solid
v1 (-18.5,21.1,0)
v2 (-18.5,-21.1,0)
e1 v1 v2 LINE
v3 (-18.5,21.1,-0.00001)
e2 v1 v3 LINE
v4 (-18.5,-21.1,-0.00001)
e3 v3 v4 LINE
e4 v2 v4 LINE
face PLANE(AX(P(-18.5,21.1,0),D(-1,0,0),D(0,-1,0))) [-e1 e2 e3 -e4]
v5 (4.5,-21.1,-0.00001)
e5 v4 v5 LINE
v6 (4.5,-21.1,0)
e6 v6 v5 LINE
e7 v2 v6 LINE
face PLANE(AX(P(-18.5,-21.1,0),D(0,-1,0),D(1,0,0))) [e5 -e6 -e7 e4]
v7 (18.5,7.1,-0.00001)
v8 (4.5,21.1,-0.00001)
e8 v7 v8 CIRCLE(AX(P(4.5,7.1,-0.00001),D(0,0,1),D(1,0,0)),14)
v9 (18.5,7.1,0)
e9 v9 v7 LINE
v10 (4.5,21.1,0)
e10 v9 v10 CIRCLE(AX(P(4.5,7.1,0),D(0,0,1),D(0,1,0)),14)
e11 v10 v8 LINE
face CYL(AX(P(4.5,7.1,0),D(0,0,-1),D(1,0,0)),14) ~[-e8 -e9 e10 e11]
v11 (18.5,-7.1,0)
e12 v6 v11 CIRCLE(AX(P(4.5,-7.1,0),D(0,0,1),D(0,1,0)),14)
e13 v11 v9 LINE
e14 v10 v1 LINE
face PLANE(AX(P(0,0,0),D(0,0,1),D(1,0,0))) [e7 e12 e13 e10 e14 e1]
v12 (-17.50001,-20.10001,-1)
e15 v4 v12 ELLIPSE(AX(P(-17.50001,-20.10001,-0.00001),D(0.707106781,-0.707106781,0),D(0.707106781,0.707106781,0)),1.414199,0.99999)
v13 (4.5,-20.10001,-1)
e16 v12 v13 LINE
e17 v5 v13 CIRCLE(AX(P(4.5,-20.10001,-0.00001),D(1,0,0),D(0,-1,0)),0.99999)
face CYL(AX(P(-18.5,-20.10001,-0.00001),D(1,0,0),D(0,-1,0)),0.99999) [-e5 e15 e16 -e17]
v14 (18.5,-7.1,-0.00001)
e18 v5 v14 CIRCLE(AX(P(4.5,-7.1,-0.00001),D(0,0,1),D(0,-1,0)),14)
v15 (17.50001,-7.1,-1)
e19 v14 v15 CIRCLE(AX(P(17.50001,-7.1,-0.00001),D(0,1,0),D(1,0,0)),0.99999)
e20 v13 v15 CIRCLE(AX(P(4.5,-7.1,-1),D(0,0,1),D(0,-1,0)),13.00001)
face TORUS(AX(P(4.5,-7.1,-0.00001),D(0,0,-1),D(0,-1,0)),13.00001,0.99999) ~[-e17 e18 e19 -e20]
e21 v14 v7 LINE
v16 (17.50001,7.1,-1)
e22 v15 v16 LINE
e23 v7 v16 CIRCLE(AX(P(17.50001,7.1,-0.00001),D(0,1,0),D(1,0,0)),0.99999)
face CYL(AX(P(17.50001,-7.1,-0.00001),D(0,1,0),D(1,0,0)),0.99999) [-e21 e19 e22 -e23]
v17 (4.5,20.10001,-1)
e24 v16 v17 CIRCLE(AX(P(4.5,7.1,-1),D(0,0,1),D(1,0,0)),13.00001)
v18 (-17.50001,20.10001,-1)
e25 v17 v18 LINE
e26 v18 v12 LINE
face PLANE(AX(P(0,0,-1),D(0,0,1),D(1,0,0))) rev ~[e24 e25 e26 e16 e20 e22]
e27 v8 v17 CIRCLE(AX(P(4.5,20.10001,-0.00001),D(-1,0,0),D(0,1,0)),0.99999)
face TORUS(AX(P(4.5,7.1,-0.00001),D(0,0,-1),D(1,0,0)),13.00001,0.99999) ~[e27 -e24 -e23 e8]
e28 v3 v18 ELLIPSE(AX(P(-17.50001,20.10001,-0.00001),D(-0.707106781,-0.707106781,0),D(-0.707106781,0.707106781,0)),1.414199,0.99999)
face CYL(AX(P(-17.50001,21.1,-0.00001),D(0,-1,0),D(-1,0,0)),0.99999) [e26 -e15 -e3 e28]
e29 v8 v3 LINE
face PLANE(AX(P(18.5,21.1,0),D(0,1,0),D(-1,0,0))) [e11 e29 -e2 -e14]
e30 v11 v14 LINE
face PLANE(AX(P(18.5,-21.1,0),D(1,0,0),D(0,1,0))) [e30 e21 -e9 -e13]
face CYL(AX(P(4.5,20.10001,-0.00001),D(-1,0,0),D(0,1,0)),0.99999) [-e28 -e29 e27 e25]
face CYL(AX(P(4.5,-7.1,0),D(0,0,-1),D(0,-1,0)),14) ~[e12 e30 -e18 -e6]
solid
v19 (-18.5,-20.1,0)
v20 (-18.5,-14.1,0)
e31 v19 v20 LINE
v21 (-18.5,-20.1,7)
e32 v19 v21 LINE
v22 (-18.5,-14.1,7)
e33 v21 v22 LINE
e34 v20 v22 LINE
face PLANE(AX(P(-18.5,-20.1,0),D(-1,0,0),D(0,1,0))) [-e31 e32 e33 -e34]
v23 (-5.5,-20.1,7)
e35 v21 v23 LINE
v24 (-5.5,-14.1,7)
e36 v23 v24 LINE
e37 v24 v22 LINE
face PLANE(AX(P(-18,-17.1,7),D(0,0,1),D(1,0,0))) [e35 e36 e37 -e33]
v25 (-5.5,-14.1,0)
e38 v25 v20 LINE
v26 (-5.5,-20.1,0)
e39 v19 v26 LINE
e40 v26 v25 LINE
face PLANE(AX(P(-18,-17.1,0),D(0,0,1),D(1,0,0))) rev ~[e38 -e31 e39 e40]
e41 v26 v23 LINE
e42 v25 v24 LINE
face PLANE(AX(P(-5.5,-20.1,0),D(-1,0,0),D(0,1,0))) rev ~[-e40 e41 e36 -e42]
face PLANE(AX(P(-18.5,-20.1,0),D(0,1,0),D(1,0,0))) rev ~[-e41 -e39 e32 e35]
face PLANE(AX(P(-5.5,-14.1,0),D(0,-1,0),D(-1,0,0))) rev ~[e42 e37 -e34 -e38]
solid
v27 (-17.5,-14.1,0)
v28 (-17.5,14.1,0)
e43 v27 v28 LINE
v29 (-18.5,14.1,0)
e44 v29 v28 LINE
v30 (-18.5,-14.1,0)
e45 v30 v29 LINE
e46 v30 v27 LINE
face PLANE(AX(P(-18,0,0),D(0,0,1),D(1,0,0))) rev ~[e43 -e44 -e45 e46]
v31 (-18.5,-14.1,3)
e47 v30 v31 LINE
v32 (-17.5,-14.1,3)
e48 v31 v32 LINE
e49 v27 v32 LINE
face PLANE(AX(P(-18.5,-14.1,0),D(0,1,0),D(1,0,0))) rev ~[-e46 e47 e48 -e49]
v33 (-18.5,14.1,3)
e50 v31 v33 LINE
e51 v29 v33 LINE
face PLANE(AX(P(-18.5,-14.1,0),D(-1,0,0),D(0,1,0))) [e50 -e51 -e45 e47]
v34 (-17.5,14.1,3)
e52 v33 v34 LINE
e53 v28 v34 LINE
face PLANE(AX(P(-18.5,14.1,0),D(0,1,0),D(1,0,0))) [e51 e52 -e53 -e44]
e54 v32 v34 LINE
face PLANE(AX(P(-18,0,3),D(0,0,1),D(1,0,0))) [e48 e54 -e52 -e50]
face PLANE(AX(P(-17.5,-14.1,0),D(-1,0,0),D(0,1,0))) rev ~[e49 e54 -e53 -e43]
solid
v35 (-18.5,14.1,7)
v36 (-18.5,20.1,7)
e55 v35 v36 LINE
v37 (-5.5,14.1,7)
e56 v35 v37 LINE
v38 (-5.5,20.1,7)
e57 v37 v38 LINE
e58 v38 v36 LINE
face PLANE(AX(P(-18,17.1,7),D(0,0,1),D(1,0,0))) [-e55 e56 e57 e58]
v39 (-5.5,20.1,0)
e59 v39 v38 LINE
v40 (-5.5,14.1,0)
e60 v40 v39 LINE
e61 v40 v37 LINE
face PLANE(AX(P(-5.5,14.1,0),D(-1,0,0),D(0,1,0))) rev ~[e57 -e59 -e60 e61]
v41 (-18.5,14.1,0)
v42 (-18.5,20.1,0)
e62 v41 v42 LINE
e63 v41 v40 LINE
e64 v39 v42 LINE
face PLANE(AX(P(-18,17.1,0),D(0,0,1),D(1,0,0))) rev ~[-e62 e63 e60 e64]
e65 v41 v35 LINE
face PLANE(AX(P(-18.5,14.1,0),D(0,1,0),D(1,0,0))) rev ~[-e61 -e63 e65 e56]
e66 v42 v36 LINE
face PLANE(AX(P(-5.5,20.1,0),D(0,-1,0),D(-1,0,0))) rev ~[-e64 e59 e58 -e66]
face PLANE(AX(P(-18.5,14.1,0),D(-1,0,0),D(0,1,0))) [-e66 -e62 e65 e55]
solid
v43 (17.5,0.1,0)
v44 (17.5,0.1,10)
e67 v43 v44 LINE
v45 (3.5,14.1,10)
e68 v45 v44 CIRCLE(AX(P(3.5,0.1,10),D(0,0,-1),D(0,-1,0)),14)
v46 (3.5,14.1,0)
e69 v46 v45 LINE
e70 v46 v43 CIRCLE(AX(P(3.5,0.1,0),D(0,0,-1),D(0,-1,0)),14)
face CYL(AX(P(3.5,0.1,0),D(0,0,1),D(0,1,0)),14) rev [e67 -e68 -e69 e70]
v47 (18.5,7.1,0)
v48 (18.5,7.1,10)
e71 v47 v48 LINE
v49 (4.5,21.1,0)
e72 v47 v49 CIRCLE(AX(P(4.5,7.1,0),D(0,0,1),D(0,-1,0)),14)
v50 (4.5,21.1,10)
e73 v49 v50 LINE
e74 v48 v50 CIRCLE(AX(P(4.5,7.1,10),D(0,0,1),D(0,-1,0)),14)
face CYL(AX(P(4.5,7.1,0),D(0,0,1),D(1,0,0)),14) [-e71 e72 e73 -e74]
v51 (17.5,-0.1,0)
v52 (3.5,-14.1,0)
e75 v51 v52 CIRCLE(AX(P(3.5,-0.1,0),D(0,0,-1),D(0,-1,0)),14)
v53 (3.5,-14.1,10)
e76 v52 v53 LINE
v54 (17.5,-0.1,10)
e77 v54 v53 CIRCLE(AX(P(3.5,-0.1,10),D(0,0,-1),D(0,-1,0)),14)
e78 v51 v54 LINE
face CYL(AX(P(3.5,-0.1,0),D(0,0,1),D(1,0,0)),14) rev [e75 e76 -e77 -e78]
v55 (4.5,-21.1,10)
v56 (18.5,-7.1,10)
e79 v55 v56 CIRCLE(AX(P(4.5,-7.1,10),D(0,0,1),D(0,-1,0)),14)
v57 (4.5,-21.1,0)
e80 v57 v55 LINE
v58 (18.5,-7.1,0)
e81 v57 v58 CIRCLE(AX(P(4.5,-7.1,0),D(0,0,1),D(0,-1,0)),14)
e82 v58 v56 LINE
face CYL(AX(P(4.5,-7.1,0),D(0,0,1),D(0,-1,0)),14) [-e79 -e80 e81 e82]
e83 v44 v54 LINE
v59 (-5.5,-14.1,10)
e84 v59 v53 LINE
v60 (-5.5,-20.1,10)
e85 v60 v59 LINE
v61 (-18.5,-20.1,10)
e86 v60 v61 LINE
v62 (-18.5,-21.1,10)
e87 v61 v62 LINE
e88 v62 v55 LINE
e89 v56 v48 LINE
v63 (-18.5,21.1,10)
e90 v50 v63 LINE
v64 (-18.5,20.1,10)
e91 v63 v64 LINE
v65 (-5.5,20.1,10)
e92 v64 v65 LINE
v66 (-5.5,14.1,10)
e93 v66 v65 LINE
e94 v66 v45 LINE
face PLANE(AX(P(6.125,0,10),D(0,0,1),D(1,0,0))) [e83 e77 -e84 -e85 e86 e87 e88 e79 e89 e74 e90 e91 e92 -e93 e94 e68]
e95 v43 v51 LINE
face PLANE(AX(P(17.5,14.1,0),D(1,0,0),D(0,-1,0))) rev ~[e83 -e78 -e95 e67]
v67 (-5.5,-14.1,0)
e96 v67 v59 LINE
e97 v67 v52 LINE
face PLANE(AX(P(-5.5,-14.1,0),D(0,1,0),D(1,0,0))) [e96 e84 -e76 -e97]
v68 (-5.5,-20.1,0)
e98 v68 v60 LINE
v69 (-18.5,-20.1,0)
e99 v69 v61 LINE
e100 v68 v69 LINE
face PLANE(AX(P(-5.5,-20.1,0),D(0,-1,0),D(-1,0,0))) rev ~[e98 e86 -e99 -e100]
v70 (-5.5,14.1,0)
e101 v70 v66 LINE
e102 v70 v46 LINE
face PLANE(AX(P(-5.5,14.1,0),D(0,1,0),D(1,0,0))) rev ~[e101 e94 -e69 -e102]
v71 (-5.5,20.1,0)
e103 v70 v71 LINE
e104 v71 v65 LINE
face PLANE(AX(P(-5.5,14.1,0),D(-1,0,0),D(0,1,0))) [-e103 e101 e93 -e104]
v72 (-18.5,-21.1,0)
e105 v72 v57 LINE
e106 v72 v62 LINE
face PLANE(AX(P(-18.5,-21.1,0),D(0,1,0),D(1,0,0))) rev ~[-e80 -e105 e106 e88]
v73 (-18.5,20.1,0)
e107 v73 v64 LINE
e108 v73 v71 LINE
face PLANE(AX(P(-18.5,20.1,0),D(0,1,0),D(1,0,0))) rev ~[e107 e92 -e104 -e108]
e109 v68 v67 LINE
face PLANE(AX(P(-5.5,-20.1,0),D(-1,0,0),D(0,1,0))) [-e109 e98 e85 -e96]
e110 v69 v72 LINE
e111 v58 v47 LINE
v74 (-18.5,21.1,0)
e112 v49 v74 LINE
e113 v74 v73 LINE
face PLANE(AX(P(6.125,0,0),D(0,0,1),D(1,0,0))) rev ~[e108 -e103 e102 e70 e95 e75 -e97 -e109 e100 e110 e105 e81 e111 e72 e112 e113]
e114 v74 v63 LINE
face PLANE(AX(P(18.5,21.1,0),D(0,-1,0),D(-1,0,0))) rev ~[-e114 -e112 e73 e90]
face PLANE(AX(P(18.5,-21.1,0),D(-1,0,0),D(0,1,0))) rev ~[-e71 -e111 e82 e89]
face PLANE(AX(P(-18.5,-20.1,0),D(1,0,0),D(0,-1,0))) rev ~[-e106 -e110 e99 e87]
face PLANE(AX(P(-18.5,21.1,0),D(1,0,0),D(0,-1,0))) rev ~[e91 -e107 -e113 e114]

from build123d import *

# Parameters (mm, degrees)
F0_W     = 1
F0_H     = 28.2
F1_DEPTH = 3
F0_H_2   = 6
F0_W_2   = 12
F2_DEPTH = 7
F0_W_3   = 23
F3_DEPTH = 10
F4_DEPTH = 1
F5_R     = 14
F5_2_R   = 14
F6_R     = 0.99999


# Not quite as in the source:
# - a fillet or chamfer is up to 0.001 mm smaller than in the source, because OpenCascade refuses the exact size


with BuildPart() as f1:
    # F0 (on Top) → F1 (new body)
    with BuildSketch(Plane.XY):
        with Locations((-18, 0)):
            Rectangle(F0_W, F0_H)
    extrude(amount=F1_DEPTH)


with BuildPart() as f2:
    # F0 (on Top) → F2 (new body)
    with BuildSketch(Plane.XY):
        with Locations((-18, 17.1)):
            Rectangle(F0_W, F0_H_2)
        with Locations((-11.5, 17.1)):
            Rectangle(F0_W_2, F0_H_2)
    extrude(amount=F2_DEPTH)


with BuildPart() as f2b:
    # F0 (on Top) → F2, piece 2 (new body)
    with BuildSketch(Plane.XY):
        with Locations((-18, -17.1)):
            Rectangle(F0_W, F0_H_2)
        with Locations((-11.5, -17.1)):
            Rectangle(F0_W_2, F0_H_2)
    extrude(amount=F2_DEPTH)


with BuildPart() as f3:
    # F0 (on Top) → F3 (new body)
    with BuildSketch(Plane.XY):
        Polygon((17.5, -14.1), (17.5, -20.1), (-5.5, -20.1), (-17.5, -20.1), (-18.5, -20.1), (-18.5, -21.1), (18.5, -21.1), (18.5, 21.1), (-18.5, 21.1), (-18.5, 20.1), (-17.5, 20.1), (-5.5, 20.1), (17.5, 20.1), (17.5, 14.1), align=None)
        with Locations((6, 17.1)):
            Rectangle(F0_W_3, F0_H_2)
        with Locations((6, -17.1)):
            Rectangle(F0_W_3, F0_H_2)
    extrude(amount=F3_DEPTH)

    # F5
    f5_edges = [f3.edges().sort_by_distance(p)[0] for p in [
        (17.5, 14.1, 5),
        (17.5, -14.1, 5),
        (18.5, 21.1, 5),
        (18.5, -21.1, 5),
    ]]
    fillet(f5_edges, radius=F5_R)


with BuildPart() as f4:
    # F0 (on Top) → F4 (new body)
    with BuildSketch(Plane.XY):
        Polygon((-5.5, -14.1), (17.5, -14.1), (17.5, 14.1), (-5.5, 14.1), (-17.5, 14.1), (-17.5, -14.1), align=None)
        with Locations((-18, 17.1)):
            Rectangle(F0_W, F0_H_2)
        Polygon((17.5, -14.1), (17.5, -20.1), (-5.5, -20.1), (-17.5, -20.1), (-18.5, -20.1), (-18.5, -21.1), (18.5, -21.1), (18.5, 21.1), (-18.5, 21.1), (-18.5, 20.1), (-17.5, 20.1), (-5.5, 20.1), (17.5, 20.1), (17.5, 14.1), align=None)
        with Locations((-11.5, 17.1)):
            Rectangle(F0_W_2, F0_H_2)
        with Locations((6, 17.1)):
            Rectangle(F0_W_3, F0_H_2)
        with Locations((-18, 0)):
            Rectangle(F0_W, F0_H)
        with Locations((-18, -17.1)):
            Rectangle(F0_W, F0_H_2)
        with Locations((-11.5, -17.1)):
            Rectangle(F0_W_2, F0_H_2)
        with Locations((6, -17.1)):
            Rectangle(F0_W_3, F0_H_2)
    extrude(amount=-F4_DEPTH)

    # F5#2
    f5_2_edges = [f4.edges().sort_by_distance(p)[0] for p in [
        (18.5, 21.1, -0.5),
        (18.5, -21.1, -0.5),
    ]]
    fillet(f5_2_edges, radius=F5_2_R)

    # F6 (radius 1 in the source; OpenCascade refuses exactly that, so slightly less here)
    f6_edges = [f4.edges().sort_by_distance(p)[0] for p in [
        (-7, -21.1, -1),
        (-18.5, 0, -1),
    ]]
    fillet(f6_edges, radius=F6_R)


solid = Compound([f1.part, f2.part, f2b.part, f3.part, f4.part])
